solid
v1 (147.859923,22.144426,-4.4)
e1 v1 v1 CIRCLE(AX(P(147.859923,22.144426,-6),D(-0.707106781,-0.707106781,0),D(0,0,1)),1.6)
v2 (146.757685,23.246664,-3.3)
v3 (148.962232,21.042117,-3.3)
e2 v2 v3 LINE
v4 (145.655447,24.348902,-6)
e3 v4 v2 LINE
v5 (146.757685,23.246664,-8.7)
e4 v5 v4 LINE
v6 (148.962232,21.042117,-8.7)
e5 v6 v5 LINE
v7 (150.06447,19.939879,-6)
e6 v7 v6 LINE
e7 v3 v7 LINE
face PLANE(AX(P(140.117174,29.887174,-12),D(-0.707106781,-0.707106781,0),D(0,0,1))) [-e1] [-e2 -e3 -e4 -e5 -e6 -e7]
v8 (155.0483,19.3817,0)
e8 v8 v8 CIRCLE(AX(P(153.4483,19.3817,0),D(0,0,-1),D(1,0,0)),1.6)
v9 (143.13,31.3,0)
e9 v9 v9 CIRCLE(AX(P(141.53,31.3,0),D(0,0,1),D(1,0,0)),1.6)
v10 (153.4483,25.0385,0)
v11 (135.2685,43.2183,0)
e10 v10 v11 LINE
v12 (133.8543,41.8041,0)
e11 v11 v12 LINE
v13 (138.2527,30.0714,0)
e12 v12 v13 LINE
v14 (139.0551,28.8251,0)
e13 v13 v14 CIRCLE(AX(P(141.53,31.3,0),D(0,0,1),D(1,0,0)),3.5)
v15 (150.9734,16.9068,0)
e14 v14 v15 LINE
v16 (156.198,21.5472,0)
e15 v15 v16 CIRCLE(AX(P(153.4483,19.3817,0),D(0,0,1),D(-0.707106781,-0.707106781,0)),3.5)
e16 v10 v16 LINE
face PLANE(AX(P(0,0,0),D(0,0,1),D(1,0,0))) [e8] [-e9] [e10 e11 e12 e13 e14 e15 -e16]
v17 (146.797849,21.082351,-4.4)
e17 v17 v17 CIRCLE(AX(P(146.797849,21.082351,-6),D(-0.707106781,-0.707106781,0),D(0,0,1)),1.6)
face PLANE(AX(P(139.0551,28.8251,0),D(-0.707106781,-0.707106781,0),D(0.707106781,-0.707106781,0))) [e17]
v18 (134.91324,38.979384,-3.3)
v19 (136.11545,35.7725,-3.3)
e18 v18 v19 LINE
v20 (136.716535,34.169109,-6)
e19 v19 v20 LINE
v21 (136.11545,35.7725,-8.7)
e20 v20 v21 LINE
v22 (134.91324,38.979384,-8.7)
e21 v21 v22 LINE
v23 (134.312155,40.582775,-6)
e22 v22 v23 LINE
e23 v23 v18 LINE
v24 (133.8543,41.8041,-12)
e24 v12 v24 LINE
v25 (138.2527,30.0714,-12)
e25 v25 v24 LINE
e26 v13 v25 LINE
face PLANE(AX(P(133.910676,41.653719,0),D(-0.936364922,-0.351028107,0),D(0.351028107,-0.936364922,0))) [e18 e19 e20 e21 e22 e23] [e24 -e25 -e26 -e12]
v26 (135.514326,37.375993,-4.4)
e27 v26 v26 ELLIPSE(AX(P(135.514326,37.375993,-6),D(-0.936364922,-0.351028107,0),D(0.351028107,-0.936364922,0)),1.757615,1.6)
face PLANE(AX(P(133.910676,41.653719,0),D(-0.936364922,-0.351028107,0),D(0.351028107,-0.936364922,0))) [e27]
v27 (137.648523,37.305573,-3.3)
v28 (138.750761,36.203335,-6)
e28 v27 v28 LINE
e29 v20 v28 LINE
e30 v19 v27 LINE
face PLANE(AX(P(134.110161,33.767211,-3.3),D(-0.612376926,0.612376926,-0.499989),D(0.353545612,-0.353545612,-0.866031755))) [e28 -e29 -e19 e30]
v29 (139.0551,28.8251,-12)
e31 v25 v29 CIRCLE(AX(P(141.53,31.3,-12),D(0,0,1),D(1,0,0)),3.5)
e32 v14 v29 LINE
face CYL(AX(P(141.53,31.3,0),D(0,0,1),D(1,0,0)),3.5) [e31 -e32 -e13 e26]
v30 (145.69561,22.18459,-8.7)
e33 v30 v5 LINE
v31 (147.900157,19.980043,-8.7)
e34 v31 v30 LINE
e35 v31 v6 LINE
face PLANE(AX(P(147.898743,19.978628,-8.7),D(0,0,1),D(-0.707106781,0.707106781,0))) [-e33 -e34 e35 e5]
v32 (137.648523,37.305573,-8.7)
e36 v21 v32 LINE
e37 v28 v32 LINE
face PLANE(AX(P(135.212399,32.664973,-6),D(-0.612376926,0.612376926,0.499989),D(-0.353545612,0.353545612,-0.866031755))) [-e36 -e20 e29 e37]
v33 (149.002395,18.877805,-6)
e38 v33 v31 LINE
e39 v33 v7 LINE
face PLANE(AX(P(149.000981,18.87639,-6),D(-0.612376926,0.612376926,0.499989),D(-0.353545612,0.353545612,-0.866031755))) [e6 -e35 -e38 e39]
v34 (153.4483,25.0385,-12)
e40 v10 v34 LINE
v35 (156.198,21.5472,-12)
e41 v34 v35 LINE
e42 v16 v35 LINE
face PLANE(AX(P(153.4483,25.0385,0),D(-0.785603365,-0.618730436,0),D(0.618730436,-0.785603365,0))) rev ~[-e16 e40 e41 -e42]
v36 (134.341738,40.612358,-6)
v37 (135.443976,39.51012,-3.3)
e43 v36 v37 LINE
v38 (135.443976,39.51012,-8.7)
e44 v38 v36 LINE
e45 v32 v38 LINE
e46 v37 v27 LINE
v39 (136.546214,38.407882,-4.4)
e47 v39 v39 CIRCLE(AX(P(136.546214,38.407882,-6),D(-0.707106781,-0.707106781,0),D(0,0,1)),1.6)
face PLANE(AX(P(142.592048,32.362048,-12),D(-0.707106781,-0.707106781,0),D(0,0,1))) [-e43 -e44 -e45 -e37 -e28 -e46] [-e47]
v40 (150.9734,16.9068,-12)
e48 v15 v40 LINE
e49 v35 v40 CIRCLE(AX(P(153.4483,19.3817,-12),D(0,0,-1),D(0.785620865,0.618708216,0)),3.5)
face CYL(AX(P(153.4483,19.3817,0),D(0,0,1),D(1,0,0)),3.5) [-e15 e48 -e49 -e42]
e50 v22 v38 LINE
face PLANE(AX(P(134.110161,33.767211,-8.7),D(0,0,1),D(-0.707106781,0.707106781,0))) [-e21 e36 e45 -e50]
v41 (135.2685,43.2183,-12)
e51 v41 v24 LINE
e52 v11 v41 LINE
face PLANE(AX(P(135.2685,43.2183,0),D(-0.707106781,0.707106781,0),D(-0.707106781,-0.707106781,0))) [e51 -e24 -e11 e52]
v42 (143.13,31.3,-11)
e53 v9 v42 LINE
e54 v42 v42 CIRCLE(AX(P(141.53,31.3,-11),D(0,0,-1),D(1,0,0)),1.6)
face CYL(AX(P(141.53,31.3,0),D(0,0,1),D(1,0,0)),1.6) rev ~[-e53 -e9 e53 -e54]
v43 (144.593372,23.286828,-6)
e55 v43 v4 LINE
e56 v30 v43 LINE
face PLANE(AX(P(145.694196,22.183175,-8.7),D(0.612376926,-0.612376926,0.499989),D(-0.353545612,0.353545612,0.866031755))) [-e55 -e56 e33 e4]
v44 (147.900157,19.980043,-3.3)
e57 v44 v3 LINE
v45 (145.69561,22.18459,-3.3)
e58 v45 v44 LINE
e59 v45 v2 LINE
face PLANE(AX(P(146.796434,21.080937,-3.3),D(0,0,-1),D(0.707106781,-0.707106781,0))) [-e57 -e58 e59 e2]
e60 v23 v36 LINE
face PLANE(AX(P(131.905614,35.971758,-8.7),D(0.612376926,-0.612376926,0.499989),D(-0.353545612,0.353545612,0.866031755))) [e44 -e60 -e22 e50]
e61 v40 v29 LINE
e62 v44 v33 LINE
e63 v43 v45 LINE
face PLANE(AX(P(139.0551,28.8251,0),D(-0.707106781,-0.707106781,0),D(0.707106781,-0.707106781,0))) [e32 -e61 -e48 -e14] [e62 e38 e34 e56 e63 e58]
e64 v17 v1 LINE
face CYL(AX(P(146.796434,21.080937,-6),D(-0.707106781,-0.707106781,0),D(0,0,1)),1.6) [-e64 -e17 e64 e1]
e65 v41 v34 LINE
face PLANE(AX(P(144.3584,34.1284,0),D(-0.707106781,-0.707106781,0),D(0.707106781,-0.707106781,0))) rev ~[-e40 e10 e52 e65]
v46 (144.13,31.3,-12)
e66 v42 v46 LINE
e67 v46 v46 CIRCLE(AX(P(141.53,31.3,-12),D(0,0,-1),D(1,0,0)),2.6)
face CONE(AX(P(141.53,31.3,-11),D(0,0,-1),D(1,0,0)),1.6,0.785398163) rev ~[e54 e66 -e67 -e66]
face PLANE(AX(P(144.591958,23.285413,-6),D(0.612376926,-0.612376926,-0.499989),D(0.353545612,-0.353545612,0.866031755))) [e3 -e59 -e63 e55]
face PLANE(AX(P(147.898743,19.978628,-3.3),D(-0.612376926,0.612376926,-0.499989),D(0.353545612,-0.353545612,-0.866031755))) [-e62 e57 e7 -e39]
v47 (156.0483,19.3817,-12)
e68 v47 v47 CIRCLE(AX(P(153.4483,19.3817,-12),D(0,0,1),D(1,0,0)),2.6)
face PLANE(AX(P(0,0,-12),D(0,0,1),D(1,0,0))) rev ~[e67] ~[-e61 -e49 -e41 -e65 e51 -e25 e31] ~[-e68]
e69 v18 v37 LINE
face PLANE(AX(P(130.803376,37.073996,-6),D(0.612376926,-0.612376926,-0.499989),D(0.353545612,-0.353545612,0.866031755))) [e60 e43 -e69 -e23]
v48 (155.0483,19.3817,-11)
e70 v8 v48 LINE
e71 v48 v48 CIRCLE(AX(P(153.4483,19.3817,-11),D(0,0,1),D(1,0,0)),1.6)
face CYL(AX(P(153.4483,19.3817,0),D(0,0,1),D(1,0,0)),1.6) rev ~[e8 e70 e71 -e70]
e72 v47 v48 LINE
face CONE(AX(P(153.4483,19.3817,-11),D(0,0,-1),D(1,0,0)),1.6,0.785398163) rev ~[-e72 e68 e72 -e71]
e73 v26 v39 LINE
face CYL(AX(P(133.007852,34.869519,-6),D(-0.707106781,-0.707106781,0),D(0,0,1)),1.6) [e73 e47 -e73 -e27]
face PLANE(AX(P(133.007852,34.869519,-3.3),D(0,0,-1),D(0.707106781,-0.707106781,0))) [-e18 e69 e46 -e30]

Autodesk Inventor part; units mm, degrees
ref_plane "YZ Plane" through (0, 0, 0) normal (1, 0, 0) x (0, 1, 0)
ref_plane "XZ Plane" through (0, 0, 0) normal (0, 1, 0) x (-1, 0, 0)
ref_plane "XY Plane" through (0, 0, 0) normal (0, 0, 1) x (1, 0, 0)
sketch "Эскиз1" plane through (0, 0, 0) normal (0, 0, 1) x (1, 0, 0)
  line L0 (-5, -1.0438) -> (49.0851, -1.0438) projected
  circle A0 centre (141.53, 31.3) radius 1.6
  circle A1 centre (141.53, 31.3) radius 12.8551
  line L1 (141.53, 31.3) -> (144.3584, 34.1284)
  line L2 (144.3584, 34.1284) -> (153.4483, 25.0385)
  line L3 (144.3584, 34.1284) -> (135.2685, 43.2183)
  line L4 (135.2685, 43.2183) -> (132.4401, 40.3899)
  line L5 (133.8543, 41.8041) -> (152.0341, 23.6243)
  line L6 (152.0341, 23.6243) -> (153.4483, 25.0385)
  circle A2 centre (141.53, 31.3) radius 3.5
  line L7 (133.8543, 41.8041) -> (138.2527, 30.0714)
  line L8 (141.53, 31.3) -> (150.6199, 22.2101)
  line L9 (150.6199, 22.2101) -> (153.4483, 19.3817)
  circle A3 centre (153.4483, 19.3817) radius 1.6
  circle A4 centre (153.4483, 19.3817) radius 3.5
  line L10 (139.0551, 28.8251) -> (150.9734, 16.9068)
  line L11 (153.4483, 25.0385) -> (156.198, 21.5472)
  ellipse E0 centre (50.75, 20.1064) end of major axis (50.75, -5.3184) minor radius 3 (49.0851, -1.0438) -> (50.4608, -5.2) ccw projected
  line L12 (-5, -9.3562) -> (-5, -1.0438) projected
  line L13 (49.0851, -9.3562) -> (-5, -9.3562) projected
  ellipse E1 centre (50.75, -30.5064) end of major axis (50.75, -5.0816) minor radius 3 (50.4608, -5.2) -> (49.0851, -9.3562) ccw projected
  line L14 (135.2688, -53.6185) -> (153.4482, -35.4383) projected
  line L15 (153.4482, -35.4383) -> (156.1979, -31.9467) projected
  arc A5 (156.1979, -31.9467) -> (150.9733, -27.3065) centre (153.4482, -29.7813) ccw projected
  line L16 (150.9733, -27.3065) -> (139.0551, -39.2252) projected
  arc A6 (139.0551, -39.2252) -> (138.2526, -40.4715) centre (141.5299, -41.7001) ccw projected
  line L17 (138.2526, -40.4715) -> (133.8546, -52.2043) projected
  line L18 (133.8546, -52.2043) -> (135.2688, -53.6185) projected
  circle A7 centre (153.4482, -29.7813) radius 1.6 projected
  circle A8 centre (141.5299, -41.7001) radius 1.6 projected
  arc A9 (133.5218, -22.9864) -> (138.03, -21.6481) centre (141.53, -41.7) ccw projected
  arc A10 (138.03, -25.2121) -> (137.4201, -25.3535) centre (141.5299, -41.7001) ccw projected
  line L19 (137.4201, -25.3535) -> (133.5218, -22.9864) projected
  line L20 (138.03, -21.6481) -> (138.03, -25.2121) projected
  point P0 (0, 0)
  point P1 (139.0604, -39.2199)
  point P2 (144.9752, 30.6832)
  point P3 (140.9132, 34.7452)
  point P4 (133.9107, 41.6537)
  point P5 (135.7198, 42.7671)
  dimension "d0" = 3.2
  dimension "d1" = 4
  dimension "d2" = 7
  dimension "d3" = 4
  dimension "d4" = 3.2
  dimension "d5" = 7
extrude "Выдавливание1" add sketch "Эскиз1" against normal blind 12 contours A0 L1 L5 A2 L8 | A0 L8 A2 L5 L1 | L5 A2 L1 | L1 A2 L5 | L8 A1 L10 A2 | A2 L5 A1 L8 | A2 L5 A1 L3 L1 | L1 L2 A1 L5 A2 | A2 L7 A1 L5 | L9 A4 L10 A1 | A1 L5 L6 L11 A4 L9 | L5 L4 L3 A1 | A1 L7 L5 | A1 L2 L6 L5 | A4
chamfer "Фаска1" distance 1 angle 45 2 edges at (151.8483, 19.3817, -12) (139.93, 31.3, -12)
sketch "Эскиз2" plane through (153.4483, 25.0385, 0) normal (0.7071068, 0.7071068, 0) x (0, 0, -1)
  line L0 (0, 25.7101) -> (12, 25.7101) projected
  line L1 (6, 25.7101) -> (6, 21.4051)
  line L2 (6, 21.4051) -> (6, -7.5)
  line L3 (0, -7.5) -> (12, -7.5) projected
  line L4 (6, 21.4051) -> (6, 1.9051)
  circle A0 centre (6, 21.4051) radius 1.6
  circle A1 centre (6, 1.9051) radius 1.6
  point P0 (0, 90.7994)
  dimension "d11" = 4.305
  dimension "d12" = 19.5
  dimension "d13" = 3.2
  dimension "d14" = 3.2
extrude "Выдавливание2" [suppressed]
chamfer "Фаска2" [suppressed]
sketch "Эскиз3" plane through (139.0551, 28.8251, -12) normal (-0.7071068, -0.7071068, 0) x (0, 0, 1)
  circle A0 centre (6, -10.9499) radius 1.6 projected
  line L0 (6, -10.9499) -> (8.7, -10.9499)
  line L1 (8.7, -12.5088) -> (6, -14.0676)
  line L2 (6, -14.0676) -> (3.3, -12.5088)
  line L3 (3.3, -12.5088) -> (3.3, -9.3911)
  line L4 (3.3, -9.3911) -> (6, -7.8323)
  line L5 (6, -7.8323) -> (8.7, -9.3911)
  line L6 (8.7, -9.3911) -> (8.7, -12.5088)
  point P0 (12, 77.9444)
  dimension "d20" = 2.7
extrude "Выдавливание3" cut sketch "Эскиз3" against normal blind 1.5
sketch "Эскиз4" plane through (139.0551, 28.8251, -12) normal (-0.7071068, -0.7071068, 0) x (0, 0, 1)
  circle A0 centre (6, 8.5501) radius 1.6 projected
  line L0 (6, 8.5501) -> (8.7, 8.5501)
  line L1 (12, -12.8551) -> (12, 12.2169) projected
  line L2 (8.7, 6.9912) -> (6, 5.4324)
  line L3 (6, 5.4324) -> (3.3, 6.9912)
  line L4 (3.3, 6.9912) -> (3.3, 10.1089)
  line L5 (3.3, 10.1089) -> (6, 11.6677)
  line L6 (6, 11.6677) -> (8.7, 10.1089)
  line L7 (8.7, 10.1089) -> (8.7, 6.9912)
  point P0 (12, 77.9444)
  point P1 (12, 12.8551)
  point P2 (6, 8.5501)
  dimension "d23" = 2.7
extrude "Выдавливание4" cut sketch "Эскиз4" against normal blind 5
properties part number "laser_krepl_right"
